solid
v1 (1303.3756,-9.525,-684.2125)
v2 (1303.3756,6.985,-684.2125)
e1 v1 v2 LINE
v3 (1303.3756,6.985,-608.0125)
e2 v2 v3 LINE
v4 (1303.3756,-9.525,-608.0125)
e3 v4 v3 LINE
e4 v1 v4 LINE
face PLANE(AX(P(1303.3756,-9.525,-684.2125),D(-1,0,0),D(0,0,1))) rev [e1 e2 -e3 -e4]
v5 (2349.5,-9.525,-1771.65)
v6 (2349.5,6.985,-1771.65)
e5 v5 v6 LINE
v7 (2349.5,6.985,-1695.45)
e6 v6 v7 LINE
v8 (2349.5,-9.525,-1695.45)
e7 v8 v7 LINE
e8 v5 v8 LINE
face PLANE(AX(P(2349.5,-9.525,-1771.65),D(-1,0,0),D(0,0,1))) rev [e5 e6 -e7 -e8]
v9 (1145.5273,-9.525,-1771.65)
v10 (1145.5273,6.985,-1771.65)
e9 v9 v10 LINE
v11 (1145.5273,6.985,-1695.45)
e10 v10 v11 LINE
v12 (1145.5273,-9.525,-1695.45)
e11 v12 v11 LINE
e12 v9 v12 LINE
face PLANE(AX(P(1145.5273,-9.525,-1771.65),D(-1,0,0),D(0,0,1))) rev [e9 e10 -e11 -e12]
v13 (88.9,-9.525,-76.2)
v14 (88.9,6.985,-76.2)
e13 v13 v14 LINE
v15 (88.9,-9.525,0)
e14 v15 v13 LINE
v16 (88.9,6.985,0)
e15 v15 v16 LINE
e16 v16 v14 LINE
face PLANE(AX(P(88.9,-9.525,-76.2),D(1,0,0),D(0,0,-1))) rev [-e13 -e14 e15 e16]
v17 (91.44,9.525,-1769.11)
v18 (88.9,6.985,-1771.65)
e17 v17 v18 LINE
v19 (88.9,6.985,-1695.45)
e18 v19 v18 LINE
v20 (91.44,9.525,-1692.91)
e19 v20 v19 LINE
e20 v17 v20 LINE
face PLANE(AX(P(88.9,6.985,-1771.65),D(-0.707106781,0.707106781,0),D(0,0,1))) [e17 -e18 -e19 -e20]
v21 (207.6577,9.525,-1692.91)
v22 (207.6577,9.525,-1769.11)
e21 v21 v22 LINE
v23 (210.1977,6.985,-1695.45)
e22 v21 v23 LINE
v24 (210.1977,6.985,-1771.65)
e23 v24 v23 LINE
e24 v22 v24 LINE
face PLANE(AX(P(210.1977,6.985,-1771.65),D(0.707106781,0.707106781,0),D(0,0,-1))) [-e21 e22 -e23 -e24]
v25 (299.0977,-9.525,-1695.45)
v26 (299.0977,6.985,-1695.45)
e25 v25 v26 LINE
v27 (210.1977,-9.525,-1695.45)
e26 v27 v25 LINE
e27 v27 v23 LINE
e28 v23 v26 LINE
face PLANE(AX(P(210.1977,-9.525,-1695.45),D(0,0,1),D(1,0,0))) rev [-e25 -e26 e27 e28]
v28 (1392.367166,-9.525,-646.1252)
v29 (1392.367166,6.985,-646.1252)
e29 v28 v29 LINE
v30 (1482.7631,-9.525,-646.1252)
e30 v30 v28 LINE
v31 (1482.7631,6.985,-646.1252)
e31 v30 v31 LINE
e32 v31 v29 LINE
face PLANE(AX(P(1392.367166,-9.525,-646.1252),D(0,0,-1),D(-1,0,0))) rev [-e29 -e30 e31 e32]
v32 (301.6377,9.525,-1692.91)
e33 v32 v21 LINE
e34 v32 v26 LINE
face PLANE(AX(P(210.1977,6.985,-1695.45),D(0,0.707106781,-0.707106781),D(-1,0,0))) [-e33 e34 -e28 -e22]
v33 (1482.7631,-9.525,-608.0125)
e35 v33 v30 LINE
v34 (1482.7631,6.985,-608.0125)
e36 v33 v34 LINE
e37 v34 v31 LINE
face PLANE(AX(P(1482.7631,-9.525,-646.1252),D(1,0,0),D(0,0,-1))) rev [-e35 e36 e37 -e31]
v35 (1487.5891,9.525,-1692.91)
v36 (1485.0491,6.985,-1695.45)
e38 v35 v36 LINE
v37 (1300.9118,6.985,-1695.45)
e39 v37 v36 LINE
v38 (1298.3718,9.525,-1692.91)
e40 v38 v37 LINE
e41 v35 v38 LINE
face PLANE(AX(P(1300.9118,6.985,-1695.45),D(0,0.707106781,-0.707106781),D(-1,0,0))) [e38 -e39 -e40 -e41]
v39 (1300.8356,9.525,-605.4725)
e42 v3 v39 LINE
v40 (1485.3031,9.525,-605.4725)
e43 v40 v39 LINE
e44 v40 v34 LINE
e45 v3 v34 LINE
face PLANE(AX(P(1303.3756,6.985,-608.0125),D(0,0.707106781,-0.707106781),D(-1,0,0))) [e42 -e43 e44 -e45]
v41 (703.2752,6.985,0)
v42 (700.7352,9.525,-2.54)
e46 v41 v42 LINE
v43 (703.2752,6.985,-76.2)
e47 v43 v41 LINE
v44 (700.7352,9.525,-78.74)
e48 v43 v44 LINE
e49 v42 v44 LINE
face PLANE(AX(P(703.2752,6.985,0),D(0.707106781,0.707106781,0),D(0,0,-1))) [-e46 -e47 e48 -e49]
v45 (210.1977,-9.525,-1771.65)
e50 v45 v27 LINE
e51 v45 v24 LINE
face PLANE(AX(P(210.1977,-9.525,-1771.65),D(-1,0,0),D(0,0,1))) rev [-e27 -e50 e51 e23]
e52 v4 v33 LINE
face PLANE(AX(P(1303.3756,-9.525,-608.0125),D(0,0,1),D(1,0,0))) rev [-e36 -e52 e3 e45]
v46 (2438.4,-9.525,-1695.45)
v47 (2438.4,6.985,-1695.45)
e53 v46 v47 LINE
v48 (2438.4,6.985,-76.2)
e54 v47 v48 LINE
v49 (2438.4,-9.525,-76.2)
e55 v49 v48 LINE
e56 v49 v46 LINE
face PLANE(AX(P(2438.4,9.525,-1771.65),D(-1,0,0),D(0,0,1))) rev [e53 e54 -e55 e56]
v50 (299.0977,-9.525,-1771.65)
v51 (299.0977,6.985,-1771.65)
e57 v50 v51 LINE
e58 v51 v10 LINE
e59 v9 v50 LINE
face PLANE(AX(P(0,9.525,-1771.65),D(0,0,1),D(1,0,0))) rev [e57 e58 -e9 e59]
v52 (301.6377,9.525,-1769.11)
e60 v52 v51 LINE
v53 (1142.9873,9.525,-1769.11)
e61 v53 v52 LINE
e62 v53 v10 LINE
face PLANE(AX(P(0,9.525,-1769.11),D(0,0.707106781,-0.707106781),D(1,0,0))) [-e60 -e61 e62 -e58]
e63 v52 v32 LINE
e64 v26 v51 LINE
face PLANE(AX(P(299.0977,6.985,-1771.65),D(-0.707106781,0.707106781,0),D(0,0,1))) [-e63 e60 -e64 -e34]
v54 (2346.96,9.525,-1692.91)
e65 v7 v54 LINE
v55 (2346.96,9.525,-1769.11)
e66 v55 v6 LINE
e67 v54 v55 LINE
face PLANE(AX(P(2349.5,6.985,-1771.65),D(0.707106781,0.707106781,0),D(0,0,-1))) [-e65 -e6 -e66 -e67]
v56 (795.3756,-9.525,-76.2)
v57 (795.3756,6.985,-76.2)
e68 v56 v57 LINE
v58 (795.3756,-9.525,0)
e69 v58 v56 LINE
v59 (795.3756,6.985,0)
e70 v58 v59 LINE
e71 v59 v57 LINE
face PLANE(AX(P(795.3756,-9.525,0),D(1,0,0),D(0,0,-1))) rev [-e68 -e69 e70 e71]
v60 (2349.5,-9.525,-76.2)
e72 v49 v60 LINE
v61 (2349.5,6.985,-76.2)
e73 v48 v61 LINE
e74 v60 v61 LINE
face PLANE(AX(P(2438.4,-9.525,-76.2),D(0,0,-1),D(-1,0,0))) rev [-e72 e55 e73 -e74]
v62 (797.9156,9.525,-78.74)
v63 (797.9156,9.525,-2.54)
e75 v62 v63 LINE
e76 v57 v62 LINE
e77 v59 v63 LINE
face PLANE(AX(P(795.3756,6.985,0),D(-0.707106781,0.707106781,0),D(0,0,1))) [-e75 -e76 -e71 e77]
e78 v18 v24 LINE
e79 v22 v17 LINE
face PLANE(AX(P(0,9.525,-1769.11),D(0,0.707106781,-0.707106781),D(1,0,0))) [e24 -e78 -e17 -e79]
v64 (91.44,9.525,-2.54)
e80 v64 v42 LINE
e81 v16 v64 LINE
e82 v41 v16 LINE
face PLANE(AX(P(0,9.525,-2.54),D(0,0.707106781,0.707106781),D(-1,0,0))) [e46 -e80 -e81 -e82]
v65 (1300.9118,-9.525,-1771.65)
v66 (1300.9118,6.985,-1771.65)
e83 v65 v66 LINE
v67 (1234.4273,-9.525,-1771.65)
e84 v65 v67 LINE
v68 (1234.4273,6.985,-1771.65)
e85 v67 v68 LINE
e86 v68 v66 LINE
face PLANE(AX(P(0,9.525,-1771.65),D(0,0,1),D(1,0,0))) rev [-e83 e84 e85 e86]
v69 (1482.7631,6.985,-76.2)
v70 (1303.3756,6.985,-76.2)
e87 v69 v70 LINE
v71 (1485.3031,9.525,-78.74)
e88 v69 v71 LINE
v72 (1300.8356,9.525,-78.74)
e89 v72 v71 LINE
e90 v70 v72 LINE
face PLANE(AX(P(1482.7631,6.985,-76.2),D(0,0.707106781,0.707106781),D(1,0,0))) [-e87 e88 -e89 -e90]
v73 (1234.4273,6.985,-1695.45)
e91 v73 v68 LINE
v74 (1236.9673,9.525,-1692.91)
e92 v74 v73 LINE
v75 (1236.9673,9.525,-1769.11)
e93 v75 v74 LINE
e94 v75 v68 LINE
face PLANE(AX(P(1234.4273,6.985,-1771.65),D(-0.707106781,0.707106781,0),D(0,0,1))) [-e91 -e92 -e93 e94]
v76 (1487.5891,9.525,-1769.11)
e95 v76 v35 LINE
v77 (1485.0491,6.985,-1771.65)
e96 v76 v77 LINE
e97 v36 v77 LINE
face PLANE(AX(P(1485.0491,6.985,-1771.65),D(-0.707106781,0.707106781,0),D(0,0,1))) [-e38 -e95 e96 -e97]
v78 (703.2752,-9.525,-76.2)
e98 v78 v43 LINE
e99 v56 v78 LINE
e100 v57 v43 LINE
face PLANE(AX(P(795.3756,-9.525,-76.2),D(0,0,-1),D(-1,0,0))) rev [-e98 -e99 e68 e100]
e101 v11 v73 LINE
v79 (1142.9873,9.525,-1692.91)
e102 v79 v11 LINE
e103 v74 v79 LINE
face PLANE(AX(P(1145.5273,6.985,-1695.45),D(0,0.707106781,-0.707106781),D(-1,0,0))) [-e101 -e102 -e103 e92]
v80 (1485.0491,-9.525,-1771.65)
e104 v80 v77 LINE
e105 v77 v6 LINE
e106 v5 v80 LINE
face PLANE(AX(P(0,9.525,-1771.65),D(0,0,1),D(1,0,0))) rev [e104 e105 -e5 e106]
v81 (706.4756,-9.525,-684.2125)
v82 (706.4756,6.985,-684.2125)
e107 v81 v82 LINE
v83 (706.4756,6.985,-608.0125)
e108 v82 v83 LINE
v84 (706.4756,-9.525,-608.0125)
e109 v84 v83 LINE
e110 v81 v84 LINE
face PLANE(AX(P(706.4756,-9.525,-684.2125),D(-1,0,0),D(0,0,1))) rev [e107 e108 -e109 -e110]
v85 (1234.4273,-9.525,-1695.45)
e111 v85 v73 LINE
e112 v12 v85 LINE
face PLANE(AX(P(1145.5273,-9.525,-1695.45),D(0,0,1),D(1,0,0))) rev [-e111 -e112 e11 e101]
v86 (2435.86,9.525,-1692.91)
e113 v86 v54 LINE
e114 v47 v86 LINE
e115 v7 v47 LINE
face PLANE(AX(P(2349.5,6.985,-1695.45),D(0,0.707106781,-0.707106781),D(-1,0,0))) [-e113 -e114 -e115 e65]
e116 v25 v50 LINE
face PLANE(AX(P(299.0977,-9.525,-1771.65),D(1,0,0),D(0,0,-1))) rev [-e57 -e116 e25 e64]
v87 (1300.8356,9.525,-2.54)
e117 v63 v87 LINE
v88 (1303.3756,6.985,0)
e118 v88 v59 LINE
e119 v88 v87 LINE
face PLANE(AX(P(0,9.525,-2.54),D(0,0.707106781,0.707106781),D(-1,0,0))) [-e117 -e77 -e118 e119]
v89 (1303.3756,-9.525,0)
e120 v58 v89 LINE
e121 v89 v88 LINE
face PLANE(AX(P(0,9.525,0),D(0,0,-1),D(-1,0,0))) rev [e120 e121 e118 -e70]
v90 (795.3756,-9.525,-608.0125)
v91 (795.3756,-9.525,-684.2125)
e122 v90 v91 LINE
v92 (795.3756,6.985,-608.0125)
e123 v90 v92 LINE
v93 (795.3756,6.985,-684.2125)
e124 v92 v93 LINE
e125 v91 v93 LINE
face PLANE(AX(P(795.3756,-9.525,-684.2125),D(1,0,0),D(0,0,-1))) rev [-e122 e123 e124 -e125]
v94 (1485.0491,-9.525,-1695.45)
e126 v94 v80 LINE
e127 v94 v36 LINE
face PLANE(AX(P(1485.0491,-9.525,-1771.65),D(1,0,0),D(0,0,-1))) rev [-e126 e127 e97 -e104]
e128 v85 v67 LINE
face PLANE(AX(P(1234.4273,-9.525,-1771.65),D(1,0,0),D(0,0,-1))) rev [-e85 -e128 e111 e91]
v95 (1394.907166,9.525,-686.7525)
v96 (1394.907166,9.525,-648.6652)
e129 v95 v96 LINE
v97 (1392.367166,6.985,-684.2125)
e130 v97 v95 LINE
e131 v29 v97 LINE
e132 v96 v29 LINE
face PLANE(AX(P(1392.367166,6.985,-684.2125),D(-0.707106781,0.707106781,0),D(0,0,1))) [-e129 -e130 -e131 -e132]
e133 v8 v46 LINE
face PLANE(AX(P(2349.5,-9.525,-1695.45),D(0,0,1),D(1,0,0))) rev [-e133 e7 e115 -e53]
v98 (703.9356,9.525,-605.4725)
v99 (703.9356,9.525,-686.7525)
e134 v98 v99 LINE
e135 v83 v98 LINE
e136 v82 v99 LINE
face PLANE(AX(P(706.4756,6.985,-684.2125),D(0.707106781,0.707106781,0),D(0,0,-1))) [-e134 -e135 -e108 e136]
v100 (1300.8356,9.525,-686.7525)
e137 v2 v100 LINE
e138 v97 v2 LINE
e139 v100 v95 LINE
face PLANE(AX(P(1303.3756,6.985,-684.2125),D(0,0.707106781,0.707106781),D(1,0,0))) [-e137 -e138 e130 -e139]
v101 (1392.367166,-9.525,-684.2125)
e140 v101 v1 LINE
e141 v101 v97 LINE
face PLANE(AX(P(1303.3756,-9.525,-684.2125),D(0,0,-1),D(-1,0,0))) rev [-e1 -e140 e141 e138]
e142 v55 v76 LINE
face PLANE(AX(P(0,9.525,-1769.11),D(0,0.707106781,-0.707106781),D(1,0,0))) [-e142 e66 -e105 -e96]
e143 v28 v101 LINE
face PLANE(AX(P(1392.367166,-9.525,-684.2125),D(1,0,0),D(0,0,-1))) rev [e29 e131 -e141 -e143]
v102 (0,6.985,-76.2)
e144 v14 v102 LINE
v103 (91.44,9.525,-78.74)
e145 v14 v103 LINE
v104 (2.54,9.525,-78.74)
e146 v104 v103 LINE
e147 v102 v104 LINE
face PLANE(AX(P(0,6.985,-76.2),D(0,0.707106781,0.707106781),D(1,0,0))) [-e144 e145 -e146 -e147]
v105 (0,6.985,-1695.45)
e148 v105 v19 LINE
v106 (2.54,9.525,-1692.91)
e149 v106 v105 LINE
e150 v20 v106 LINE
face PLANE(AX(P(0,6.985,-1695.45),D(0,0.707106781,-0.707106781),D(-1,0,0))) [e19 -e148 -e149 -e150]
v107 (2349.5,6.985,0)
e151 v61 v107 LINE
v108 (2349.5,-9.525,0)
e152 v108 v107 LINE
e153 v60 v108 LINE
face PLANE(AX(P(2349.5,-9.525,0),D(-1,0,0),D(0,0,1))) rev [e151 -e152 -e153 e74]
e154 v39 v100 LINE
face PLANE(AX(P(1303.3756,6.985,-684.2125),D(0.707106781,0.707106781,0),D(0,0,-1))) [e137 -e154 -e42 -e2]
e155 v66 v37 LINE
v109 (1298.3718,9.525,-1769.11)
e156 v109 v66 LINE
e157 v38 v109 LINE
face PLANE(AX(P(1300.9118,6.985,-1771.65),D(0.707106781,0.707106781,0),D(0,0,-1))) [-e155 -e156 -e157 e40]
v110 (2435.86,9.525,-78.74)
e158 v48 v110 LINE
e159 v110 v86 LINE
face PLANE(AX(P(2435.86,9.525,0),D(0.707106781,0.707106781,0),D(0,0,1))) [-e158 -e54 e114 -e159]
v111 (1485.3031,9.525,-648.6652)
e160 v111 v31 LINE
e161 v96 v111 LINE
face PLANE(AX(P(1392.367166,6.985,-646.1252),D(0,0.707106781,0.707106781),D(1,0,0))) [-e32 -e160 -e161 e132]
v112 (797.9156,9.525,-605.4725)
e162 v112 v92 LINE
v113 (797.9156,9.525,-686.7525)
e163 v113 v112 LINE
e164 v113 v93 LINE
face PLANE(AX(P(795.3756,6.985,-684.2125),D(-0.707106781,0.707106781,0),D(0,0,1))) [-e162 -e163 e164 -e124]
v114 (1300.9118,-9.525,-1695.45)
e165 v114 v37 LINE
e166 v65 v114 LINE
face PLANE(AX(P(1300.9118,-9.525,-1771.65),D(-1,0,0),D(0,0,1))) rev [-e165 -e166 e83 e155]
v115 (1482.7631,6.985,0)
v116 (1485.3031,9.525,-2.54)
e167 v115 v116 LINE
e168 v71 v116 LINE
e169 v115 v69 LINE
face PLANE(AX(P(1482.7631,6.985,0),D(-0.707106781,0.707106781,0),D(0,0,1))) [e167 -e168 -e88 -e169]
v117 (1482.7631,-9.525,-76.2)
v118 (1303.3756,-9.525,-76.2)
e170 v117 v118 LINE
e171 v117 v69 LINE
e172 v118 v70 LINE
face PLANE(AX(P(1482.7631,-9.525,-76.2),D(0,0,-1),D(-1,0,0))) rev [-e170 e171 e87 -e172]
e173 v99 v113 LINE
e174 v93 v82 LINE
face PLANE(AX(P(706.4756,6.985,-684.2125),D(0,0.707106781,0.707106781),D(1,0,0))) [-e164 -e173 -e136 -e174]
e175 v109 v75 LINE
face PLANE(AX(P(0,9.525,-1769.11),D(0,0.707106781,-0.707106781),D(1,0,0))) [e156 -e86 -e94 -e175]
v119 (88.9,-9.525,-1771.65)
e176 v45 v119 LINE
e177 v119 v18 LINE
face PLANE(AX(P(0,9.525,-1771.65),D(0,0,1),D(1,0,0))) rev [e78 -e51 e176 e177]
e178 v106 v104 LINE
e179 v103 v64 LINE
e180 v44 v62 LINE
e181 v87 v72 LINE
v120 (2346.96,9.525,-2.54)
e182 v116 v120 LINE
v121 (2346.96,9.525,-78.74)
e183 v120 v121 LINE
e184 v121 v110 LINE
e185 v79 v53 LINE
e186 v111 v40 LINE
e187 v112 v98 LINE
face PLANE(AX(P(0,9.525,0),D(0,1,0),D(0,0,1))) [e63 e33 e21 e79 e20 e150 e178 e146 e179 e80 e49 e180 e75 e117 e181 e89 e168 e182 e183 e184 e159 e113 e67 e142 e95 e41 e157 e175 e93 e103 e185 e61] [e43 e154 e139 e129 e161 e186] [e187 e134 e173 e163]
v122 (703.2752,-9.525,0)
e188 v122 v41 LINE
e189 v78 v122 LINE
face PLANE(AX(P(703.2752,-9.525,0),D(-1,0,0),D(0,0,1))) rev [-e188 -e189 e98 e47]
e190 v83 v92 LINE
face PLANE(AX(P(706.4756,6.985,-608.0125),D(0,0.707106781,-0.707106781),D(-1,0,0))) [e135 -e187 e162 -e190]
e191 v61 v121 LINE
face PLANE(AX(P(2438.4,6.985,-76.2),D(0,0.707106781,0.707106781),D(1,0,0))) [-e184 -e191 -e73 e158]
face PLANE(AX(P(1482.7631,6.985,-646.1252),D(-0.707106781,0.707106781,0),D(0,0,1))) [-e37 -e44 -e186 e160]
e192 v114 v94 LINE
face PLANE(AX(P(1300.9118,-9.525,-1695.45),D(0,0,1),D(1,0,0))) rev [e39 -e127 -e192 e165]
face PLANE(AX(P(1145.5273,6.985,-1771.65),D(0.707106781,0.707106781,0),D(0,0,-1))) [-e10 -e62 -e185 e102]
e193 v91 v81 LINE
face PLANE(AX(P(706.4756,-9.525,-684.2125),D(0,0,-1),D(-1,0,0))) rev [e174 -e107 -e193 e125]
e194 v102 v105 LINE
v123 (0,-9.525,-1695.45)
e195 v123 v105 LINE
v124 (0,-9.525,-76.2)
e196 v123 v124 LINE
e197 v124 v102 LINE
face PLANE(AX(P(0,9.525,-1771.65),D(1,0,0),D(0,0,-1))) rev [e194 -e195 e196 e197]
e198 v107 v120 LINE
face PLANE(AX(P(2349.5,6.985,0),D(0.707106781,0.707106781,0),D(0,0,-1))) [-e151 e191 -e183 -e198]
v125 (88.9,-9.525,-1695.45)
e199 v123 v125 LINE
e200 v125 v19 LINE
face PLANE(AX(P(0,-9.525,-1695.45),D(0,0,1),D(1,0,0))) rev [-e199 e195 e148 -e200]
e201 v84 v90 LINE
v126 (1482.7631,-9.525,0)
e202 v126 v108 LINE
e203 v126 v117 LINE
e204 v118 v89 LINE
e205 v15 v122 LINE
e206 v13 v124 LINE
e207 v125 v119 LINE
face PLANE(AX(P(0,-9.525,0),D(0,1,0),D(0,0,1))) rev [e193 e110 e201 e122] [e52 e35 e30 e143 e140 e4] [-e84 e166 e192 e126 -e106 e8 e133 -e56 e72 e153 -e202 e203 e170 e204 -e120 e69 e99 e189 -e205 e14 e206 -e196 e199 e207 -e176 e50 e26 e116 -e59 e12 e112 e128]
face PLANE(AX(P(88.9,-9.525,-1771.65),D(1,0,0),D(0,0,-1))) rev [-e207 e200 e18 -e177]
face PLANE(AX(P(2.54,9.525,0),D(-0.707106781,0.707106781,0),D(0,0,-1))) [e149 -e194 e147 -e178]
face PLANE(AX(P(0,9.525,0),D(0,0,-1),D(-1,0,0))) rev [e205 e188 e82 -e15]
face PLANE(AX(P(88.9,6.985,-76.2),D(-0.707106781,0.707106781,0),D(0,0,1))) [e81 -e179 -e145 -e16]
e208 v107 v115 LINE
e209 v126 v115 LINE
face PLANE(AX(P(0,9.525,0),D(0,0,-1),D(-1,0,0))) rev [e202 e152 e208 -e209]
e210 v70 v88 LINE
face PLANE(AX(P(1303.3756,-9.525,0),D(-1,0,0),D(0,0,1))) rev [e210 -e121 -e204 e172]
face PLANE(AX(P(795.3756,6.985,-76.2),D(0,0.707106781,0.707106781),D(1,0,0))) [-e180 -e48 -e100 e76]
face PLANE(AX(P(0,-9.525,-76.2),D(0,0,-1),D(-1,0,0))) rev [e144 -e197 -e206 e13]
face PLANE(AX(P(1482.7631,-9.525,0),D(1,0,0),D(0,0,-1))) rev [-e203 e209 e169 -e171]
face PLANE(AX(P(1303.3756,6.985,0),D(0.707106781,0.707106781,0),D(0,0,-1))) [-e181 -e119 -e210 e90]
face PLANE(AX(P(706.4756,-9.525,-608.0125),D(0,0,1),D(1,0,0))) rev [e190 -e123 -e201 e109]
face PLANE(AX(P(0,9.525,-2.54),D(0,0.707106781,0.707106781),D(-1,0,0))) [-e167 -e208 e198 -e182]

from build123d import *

# Parameters (mm, degrees)
SKETCH1_W                = 2438.4
SKETCH1_H                = 1771.65
BOSS_EXTRUDE1_DEPTH      = 9.525
CUT_EXTRUDE2_START       = 1303.3756
CUT_EXTRUDE2_OUTLINE_W   = 19.05
CUT_EXTRUDE2_OUTLINE_H   = 76.2
CUT_EXTRUDE2_OUTLINE_H_2 = 38.1127
CUT_EXTRUDE2_DEPTH       = 179.3875
CUT_EXTRUDE2_2_OUTLINE_W = 19.05
CUT_EXTRUDE2_2_OUTLINE_H = 76.2
CUT_EXTRUDE2_2_DEPTH     = 88.9
CUT_EXTRUDE2_START_2     = 706.4756
CUT_EXTRUDE2_3_OUTLINE_W = 19.05
CUT_EXTRUDE2_3_OUTLINE_H = 76.2
CUT_EXTRUDE2_3_DEPTH     = 88.9
CUT_EXTRUDE2_START_3     = 2349.5
CUT_EXTRUDE2_4_OUTLINE_W = 19.05
CUT_EXTRUDE2_4_OUTLINE_H = 76.2
CUT_EXTRUDE2_4_DEPTH     = 88.9
CUT_EXTRUDE2_START_4     = 210.1977
CUT_EXTRUDE2_5_OUTLINE_W = 19.05
CUT_EXTRUDE2_5_OUTLINE_H = 76.2
CUT_EXTRUDE2_5_DEPTH     = 88.9
CUT_EXTRUDE2_START_5     = 1145.5273
CUT_EXTRUDE2_6_OUTLINE_W = 19.05
CUT_EXTRUDE2_6_OUTLINE_H = 76.2
CUT_EXTRUDE2_6_DEPTH     = 88.9
CUT_EXTRUDE2_7_OUTLINE_W = 19.05
CUT_EXTRUDE2_7_OUTLINE_H = 38.0873
CUT_EXTRUDE2_7_DEPTH     = 88.991565563
CUT_EXTRUDE2_START_6     = 1300.9118
CUT_EXTRUDE2_8_OUTLINE_W = 19.05
CUT_EXTRUDE2_8_OUTLINE_H = 76.2
CUT_EXTRUDE2_8_DEPTH     = 184.1373
CUT_EXTRUDE2_START_7     = 703.2752
CUT_EXTRUDE2_9_OUTLINE_W = 19.05
CUT_EXTRUDE2_9_OUTLINE_H = 76.2
CUT_EXTRUDE2_9_DEPTH     = 3.2004
CHAMFER1_SIZE            = 2.54


# Read off the part's stored shape, not the designer's step: Cut-Extrude2
with BuildPart() as part:
    # Sketch1 → Boss-Extrude1 (new, symmetric)
    with BuildSketch(Plane(origin=(0, 0, 0), x_dir=(1, 0, 0), z_dir=(0, 1, 0))):
        with Locations((1219.2, 885.825)):
            Rectangle(SKETCH1_W, SKETCH1_H)
    extrude(amount=BOSS_EXTRUDE1_DEPTH, both=True)

    # Cut-Extrude2 outline → Cut-Extrude2 (cut)
    with BuildSketch(Plane.YZ.offset(CUT_EXTRUDE2_START)):
        with Locations((0, -1733.55)):
            Rectangle(CUT_EXTRUDE2_OUTLINE_W, CUT_EXTRUDE2_OUTLINE_H)
        with Locations((0, -627.068849999)):
            Rectangle(CUT_EXTRUDE2_OUTLINE_W, CUT_EXTRUDE2_OUTLINE_H_2)
        with Locations((0, -38.1)):
            Rectangle(CUT_EXTRUDE2_OUTLINE_W, CUT_EXTRUDE2_OUTLINE_H)
    extrude(amount=CUT_EXTRUDE2_DEPTH, mode=Mode.SUBTRACT)

    # Cut-Extrude2 2 outline → Cut-Extrude2 2 (cut)
    with BuildSketch(Plane.YZ):
        with Locations((0, -1733.55)):
            Rectangle(CUT_EXTRUDE2_2_OUTLINE_W, CUT_EXTRUDE2_2_OUTLINE_H)
        with Locations((0, -38.1)):
            Rectangle(CUT_EXTRUDE2_2_OUTLINE_W, CUT_EXTRUDE2_2_OUTLINE_H)
    extrude(amount=CUT_EXTRUDE2_2_DEPTH, mode=Mode.SUBTRACT)

    # Cut-Extrude2 3 outline → Cut-Extrude2 3 (cut)
    with BuildSketch(Plane.YZ.offset(CUT_EXTRUDE2_START_2)):
        with Locations((0, -646.112499999)):
            Rectangle(CUT_EXTRUDE2_3_OUTLINE_W, CUT_EXTRUDE2_3_OUTLINE_H)
        with Locations((0, -38.1)):
            Rectangle(CUT_EXTRUDE2_3_OUTLINE_W, CUT_EXTRUDE2_3_OUTLINE_H)
    extrude(amount=CUT_EXTRUDE2_3_DEPTH, mode=Mode.SUBTRACT)

    # Cut-Extrude2 4 outline → Cut-Extrude2 4 (cut)
    with BuildSketch(Plane.YZ.offset(CUT_EXTRUDE2_START_3)):
        with Locations((0, -1733.55)):
            Rectangle(CUT_EXTRUDE2_4_OUTLINE_W, CUT_EXTRUDE2_4_OUTLINE_H)
        with Locations((0, -38.1)):
            Rectangle(CUT_EXTRUDE2_4_OUTLINE_W, CUT_EXTRUDE2_4_OUTLINE_H)
    extrude(amount=CUT_EXTRUDE2_4_DEPTH, mode=Mode.SUBTRACT)

    # Cut-Extrude2 5 outline → Cut-Extrude2 5 (cut)
    with BuildSketch(Plane.YZ.offset(CUT_EXTRUDE2_START_4)):
        with Locations((0, -1733.55)):
            Rectangle(CUT_EXTRUDE2_5_OUTLINE_W, CUT_EXTRUDE2_5_OUTLINE_H)
    extrude(amount=CUT_EXTRUDE2_5_DEPTH, mode=Mode.SUBTRACT)

    # Cut-Extrude2 6 outline → Cut-Extrude2 6 (cut)
    with BuildSketch(Plane.YZ.offset(CUT_EXTRUDE2_START_5)):
        with Locations((0, -1733.55)):
            Rectangle(CUT_EXTRUDE2_6_OUTLINE_W, CUT_EXTRUDE2_6_OUTLINE_H)
    extrude(amount=CUT_EXTRUDE2_6_DEPTH, mode=Mode.SUBTRACT)

    # Cut-Extrude2 7 outline → Cut-Extrude2 7 (cut)
    with BuildSketch(Plane.YZ.offset(CUT_EXTRUDE2_START)):
        with Locations((0, -665.168849999)):
            Rectangle(CUT_EXTRUDE2_7_OUTLINE_W, CUT_EXTRUDE2_7_OUTLINE_H)
    extrude(amount=CUT_EXTRUDE2_7_DEPTH, mode=Mode.SUBTRACT)

    # Cut-Extrude2 8 outline → Cut-Extrude2 8 (cut)
    with BuildSketch(Plane.YZ.offset(CUT_EXTRUDE2_START_6)):
        with Locations((0, -1733.55)):
            Rectangle(CUT_EXTRUDE2_8_OUTLINE_W, CUT_EXTRUDE2_8_OUTLINE_H)
    extrude(amount=CUT_EXTRUDE2_8_DEPTH, mode=Mode.SUBTRACT)

    # Cut-Extrude2 9 outline → Cut-Extrude2 9 (cut)
    with BuildSketch(Plane.YZ.offset(CUT_EXTRUDE2_START_7)):
        with Locations((0, -38.1)):
            Rectangle(CUT_EXTRUDE2_9_OUTLINE_W, CUT_EXTRUDE2_9_OUTLINE_H)
    extrude(amount=CUT_EXTRUDE2_9_DEPTH, mode=Mode.SUBTRACT)

    # Chamfer1
    chamfer1_edges = [part.edges().sort_by_distance(p)[0] for p in [
        (1300.9118, 9.525, -1733.55),
        (1392.98045, 9.525, -1695.45),
        (1485.0491, 9.525, -1733.55),
        (2349.5, 9.525, -1733.55),
        (2393.95, 9.525, -1695.45),
        (706.4756, 9.525, -646.112499999),
        (750.9256, 9.525, -608.012499999),
        (795.3756, 9.525, -646.112499999),
        (750.9256, 9.525, -684.212499999),
        (2393.95, 9.525, -76.2),
        (2349.5, 9.525, -38.1),
        (1145.5273, 9.525, -1733.55),
        (1189.9773, 9.525, -1695.45),
        (1234.4273, 9.525, -1733.55),
        (44.45, 9.525, -1695.45),
        (88.9, 9.525, -1733.55),
        (0, 9.525, -885.825),
        (396.0876, 9.525, 0),
        (1049.3756, 9.525, 0),
        (1916.13155, 9.525, 0),
        (2438.4, 9.525, -885.825),
        (1917.27455, 9.525, -1771.65),
        (1267.66955, 9.525, -1771.65),
        (722.3125, 9.525, -1771.65),
        (149.54885, 9.525, -1771.65),
        (1303.3756, 9.525, -646.112499999),
        (1393.06935, 9.525, -608.012499999),
        (1482.7631, 9.525, -627.068849999),
        (1437.565132782, 9.525, -646.125199999),
        (1392.367165563, 9.525, -665.168849999),
        (1347.871382781, 9.525, -684.212499999),
        (88.9, 9.525, -38.1),
        (44.45, 9.525, -76.2),
        (795.3756, 9.525, -38.1),
        (749.3254, 9.525, -76.2),
        (703.2752, 9.525, -38.1),
        (1482.7631, 9.525, -38.1),
        (1393.06935, 9.525, -76.2),
        (1303.3756, 9.525, -38.1),
        (210.1977, 9.525, -1733.55),
        (254.6477, 9.525, -1695.45),
        (299.0977, 9.525, -1733.55),
    ]]
    chamfer(chamfer1_edges, length=CHAMFER1_SIZE)


solid = part.part
